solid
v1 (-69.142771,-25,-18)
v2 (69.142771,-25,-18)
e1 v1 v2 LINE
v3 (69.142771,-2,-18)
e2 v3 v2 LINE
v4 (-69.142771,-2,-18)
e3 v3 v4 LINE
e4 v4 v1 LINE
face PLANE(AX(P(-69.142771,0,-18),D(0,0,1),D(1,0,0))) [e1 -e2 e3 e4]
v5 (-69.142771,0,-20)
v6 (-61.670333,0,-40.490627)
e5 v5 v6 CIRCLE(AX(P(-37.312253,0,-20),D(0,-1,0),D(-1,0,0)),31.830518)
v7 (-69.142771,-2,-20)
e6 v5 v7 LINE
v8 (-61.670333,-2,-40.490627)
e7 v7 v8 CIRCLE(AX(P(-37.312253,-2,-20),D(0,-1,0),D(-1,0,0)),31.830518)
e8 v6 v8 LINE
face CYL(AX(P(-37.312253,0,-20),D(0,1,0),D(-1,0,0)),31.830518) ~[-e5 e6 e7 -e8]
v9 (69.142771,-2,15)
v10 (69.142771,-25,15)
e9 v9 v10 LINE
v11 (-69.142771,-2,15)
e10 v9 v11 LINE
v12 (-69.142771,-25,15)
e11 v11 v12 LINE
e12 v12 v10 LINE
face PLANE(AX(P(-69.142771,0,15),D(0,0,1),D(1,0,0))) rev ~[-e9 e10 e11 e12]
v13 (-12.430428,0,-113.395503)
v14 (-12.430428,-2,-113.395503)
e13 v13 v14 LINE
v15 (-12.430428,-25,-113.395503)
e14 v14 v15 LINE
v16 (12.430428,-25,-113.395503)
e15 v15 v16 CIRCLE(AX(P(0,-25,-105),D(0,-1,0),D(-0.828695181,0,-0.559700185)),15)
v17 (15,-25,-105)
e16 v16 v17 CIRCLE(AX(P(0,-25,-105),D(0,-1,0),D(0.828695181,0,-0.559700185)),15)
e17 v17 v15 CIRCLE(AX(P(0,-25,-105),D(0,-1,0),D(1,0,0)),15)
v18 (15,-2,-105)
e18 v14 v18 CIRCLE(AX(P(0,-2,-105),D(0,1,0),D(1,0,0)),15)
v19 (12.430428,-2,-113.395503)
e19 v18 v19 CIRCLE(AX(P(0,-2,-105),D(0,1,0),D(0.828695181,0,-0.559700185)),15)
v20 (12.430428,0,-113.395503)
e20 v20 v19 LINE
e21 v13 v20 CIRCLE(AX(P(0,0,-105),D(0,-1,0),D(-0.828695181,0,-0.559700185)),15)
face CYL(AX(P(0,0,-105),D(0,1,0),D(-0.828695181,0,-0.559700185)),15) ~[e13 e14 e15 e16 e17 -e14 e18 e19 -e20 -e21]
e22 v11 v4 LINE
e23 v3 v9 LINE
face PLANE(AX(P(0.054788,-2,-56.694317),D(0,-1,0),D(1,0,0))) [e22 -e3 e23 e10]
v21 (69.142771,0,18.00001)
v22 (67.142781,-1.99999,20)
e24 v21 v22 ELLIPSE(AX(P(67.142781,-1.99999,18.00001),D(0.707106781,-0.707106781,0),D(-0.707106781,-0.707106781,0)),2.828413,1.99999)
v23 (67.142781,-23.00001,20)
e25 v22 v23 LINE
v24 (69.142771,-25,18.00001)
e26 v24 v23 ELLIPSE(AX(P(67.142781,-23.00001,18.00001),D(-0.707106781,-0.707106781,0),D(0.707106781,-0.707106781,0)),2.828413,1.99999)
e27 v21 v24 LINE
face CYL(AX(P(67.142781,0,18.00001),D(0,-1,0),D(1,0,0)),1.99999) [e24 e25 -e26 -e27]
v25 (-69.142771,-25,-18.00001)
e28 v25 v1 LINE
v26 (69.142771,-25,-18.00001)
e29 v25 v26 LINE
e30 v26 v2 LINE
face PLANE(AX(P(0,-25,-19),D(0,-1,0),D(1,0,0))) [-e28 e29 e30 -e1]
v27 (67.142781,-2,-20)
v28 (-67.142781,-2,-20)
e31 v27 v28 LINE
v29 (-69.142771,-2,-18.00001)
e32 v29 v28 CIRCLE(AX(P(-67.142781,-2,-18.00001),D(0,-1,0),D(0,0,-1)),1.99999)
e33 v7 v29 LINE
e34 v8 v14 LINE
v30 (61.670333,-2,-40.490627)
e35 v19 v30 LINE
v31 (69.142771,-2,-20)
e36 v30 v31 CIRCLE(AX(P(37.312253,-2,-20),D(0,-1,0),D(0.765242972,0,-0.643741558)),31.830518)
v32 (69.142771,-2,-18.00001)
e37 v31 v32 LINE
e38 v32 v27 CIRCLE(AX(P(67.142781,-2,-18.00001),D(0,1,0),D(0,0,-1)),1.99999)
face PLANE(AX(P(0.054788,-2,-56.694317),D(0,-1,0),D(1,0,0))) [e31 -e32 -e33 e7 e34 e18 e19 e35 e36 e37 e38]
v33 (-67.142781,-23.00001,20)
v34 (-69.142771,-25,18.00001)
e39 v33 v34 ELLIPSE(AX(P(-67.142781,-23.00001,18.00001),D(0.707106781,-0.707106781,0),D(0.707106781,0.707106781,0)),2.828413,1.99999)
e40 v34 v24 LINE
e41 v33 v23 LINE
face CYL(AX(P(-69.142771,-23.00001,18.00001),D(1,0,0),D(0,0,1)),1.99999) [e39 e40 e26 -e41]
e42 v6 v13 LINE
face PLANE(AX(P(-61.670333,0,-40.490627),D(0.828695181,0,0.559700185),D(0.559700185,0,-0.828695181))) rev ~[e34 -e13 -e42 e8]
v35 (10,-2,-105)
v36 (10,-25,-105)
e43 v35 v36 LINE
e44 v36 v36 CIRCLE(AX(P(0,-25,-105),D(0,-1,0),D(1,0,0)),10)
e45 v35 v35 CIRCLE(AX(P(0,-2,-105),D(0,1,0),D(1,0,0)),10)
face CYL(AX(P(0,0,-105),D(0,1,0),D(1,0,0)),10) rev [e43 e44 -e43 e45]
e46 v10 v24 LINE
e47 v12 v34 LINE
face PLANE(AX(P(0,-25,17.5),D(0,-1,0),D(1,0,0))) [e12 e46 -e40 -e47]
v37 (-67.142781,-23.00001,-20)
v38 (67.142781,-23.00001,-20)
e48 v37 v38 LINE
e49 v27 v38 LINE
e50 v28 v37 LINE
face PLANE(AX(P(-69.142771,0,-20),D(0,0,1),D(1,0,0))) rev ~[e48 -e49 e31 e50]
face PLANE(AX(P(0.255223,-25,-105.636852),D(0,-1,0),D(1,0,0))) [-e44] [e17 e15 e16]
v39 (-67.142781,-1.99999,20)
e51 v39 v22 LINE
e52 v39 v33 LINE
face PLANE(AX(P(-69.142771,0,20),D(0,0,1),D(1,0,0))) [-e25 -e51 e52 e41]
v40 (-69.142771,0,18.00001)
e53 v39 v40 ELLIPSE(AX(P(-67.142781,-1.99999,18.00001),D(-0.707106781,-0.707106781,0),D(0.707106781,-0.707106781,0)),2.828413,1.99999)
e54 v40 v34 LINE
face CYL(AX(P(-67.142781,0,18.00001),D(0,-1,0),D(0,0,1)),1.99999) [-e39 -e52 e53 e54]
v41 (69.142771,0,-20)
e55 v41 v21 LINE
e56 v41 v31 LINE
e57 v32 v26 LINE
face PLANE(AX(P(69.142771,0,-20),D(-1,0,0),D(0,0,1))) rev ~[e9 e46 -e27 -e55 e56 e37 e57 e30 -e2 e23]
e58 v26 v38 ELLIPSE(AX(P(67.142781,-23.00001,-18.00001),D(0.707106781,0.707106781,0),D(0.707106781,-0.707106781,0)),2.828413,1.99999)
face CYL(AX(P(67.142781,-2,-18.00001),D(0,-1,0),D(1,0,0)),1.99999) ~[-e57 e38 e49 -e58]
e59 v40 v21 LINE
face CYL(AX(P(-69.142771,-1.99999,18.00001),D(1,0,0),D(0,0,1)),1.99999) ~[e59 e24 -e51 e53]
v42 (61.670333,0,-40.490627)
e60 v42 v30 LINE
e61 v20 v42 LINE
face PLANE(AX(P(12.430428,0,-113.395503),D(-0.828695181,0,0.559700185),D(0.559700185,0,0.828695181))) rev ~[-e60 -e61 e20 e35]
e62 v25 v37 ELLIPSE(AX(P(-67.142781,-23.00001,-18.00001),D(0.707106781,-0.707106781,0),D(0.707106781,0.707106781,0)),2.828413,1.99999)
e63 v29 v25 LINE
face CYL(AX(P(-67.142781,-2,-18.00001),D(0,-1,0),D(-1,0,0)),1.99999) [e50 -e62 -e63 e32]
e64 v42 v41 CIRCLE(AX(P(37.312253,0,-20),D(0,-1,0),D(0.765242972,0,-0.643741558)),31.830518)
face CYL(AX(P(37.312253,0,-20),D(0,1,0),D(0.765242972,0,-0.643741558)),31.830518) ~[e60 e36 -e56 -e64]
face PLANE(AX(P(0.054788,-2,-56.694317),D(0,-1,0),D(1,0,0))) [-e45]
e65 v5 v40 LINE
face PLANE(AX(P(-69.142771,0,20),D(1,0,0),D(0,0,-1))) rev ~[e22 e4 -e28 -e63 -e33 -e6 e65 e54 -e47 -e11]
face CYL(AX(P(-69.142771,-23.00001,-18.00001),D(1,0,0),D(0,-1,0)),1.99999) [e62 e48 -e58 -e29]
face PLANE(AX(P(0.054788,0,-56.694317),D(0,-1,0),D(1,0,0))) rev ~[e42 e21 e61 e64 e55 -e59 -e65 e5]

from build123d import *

# Parameters (mm, degrees)
F0_W     = 138.2855419193
F0_H     = 33
F0_R     = 10
F0_H_2   = 5
F0_H_3   = 2
F1_DEPTH = 2
F2_DEPTH = 25
F3_R     = 1.99999


# Not quite as in the source:
# - a fillet or chamfer is up to 0.001 mm smaller than in the source, because OpenCascade refuses the exact size


with BuildPart() as f1:
    # F0 (on Front) → F1 (new body)
    with BuildSketch(Plane.XZ):
        with BuildLine():
            ThreePointArc((61.670333147, -40.4906272888), (67.2163679442, -30.9053098713), (69.1427709597, -20))
            Line((69.1427709597, -20), (-69.1427709597, -20))
            ThreePointArc((-69.1427709597, -20), (-67.2163679442, -30.9053098713), (-61.670333147, -40.4906272888))
            Line((-61.670333147, -40.4906272888), (-12.4304277098, -113.3955027814))
            ThreePointArc((-12.4304277098, -113.3955027814), (-4.3899649403, -90.6567713599), (15, -105))
            ThreePointArc((15, -105), (14.3432286401, -109.3899649403), (12.4304277098, -113.3955027814))
            Line((12.4304277098, -113.3955027814), (61.670333147, -40.4906272888))
        make_face()
        with Locations((0, -1.5)):
            Rectangle(F0_W, F0_H)
        with BuildLine():
            ThreePointArc((-12.4304277098, -113.3955027814), (0, -120), (12.4304277098, -113.3955027814))
            ThreePointArc((12.4304277098, -113.3955027814), (14.3432286401, -109.3899649403), (15, -105))
            ThreePointArc((15, -105), (-4.3899649403, -90.6567713599), (-12.4304277098, -113.3955027814))
        make_face()
        with Locations((0, -105)):
            Circle(F0_R, mode=Mode.SUBTRACT)
        with Locations((0, 17.5)):
            Rectangle(F0_W, F0_H_2)
        with Locations((0, -105)):
            Circle(F0_R)
        with Locations((0, -19)):
            Rectangle(F0_W, F0_H_3)
    extrude(amount=F1_DEPTH)

    # F0 (on Front) → F2 (join)
    with BuildSketch(Plane.XZ):
        with Locations((0, 17.5)):
            Rectangle(F0_W, F0_H_2)
        with Locations((0, -19)):
            Rectangle(F0_W, F0_H_3)
        with BuildLine():
            ThreePointArc((-12.4304277098, -113.3955027814), (0, -120), (12.4304277098, -113.3955027814))
            ThreePointArc((12.4304277098, -113.3955027814), (14.3432286401, -109.3899649403), (15, -105))
            ThreePointArc((15, -105), (-4.3899649403, -90.6567713599), (-12.4304277098, -113.3955027814))
        make_face()
        with Locations((0, -105)):
            Circle(F0_R, mode=Mode.SUBTRACT)
    extrude(amount=F2_DEPTH)

    # F3 (radius 2 in the source; OpenCascade refuses exactly that, so slightly less here)
    f3_edges = [f1.edges().sort_by_distance(p)[0] for p in [
        (69.142771, -12.5, 20),
        (0, -25, 20),
        (-69.142771, -12.5, 20),
        (0, 0, 20),
        (0, -25, -20),
        (69.142771, -13.5, -20),
        (-69.142771, -13.5, -20),
    ]]
    fillet(f3_edges, radius=F3_R)


solid = f1.part
